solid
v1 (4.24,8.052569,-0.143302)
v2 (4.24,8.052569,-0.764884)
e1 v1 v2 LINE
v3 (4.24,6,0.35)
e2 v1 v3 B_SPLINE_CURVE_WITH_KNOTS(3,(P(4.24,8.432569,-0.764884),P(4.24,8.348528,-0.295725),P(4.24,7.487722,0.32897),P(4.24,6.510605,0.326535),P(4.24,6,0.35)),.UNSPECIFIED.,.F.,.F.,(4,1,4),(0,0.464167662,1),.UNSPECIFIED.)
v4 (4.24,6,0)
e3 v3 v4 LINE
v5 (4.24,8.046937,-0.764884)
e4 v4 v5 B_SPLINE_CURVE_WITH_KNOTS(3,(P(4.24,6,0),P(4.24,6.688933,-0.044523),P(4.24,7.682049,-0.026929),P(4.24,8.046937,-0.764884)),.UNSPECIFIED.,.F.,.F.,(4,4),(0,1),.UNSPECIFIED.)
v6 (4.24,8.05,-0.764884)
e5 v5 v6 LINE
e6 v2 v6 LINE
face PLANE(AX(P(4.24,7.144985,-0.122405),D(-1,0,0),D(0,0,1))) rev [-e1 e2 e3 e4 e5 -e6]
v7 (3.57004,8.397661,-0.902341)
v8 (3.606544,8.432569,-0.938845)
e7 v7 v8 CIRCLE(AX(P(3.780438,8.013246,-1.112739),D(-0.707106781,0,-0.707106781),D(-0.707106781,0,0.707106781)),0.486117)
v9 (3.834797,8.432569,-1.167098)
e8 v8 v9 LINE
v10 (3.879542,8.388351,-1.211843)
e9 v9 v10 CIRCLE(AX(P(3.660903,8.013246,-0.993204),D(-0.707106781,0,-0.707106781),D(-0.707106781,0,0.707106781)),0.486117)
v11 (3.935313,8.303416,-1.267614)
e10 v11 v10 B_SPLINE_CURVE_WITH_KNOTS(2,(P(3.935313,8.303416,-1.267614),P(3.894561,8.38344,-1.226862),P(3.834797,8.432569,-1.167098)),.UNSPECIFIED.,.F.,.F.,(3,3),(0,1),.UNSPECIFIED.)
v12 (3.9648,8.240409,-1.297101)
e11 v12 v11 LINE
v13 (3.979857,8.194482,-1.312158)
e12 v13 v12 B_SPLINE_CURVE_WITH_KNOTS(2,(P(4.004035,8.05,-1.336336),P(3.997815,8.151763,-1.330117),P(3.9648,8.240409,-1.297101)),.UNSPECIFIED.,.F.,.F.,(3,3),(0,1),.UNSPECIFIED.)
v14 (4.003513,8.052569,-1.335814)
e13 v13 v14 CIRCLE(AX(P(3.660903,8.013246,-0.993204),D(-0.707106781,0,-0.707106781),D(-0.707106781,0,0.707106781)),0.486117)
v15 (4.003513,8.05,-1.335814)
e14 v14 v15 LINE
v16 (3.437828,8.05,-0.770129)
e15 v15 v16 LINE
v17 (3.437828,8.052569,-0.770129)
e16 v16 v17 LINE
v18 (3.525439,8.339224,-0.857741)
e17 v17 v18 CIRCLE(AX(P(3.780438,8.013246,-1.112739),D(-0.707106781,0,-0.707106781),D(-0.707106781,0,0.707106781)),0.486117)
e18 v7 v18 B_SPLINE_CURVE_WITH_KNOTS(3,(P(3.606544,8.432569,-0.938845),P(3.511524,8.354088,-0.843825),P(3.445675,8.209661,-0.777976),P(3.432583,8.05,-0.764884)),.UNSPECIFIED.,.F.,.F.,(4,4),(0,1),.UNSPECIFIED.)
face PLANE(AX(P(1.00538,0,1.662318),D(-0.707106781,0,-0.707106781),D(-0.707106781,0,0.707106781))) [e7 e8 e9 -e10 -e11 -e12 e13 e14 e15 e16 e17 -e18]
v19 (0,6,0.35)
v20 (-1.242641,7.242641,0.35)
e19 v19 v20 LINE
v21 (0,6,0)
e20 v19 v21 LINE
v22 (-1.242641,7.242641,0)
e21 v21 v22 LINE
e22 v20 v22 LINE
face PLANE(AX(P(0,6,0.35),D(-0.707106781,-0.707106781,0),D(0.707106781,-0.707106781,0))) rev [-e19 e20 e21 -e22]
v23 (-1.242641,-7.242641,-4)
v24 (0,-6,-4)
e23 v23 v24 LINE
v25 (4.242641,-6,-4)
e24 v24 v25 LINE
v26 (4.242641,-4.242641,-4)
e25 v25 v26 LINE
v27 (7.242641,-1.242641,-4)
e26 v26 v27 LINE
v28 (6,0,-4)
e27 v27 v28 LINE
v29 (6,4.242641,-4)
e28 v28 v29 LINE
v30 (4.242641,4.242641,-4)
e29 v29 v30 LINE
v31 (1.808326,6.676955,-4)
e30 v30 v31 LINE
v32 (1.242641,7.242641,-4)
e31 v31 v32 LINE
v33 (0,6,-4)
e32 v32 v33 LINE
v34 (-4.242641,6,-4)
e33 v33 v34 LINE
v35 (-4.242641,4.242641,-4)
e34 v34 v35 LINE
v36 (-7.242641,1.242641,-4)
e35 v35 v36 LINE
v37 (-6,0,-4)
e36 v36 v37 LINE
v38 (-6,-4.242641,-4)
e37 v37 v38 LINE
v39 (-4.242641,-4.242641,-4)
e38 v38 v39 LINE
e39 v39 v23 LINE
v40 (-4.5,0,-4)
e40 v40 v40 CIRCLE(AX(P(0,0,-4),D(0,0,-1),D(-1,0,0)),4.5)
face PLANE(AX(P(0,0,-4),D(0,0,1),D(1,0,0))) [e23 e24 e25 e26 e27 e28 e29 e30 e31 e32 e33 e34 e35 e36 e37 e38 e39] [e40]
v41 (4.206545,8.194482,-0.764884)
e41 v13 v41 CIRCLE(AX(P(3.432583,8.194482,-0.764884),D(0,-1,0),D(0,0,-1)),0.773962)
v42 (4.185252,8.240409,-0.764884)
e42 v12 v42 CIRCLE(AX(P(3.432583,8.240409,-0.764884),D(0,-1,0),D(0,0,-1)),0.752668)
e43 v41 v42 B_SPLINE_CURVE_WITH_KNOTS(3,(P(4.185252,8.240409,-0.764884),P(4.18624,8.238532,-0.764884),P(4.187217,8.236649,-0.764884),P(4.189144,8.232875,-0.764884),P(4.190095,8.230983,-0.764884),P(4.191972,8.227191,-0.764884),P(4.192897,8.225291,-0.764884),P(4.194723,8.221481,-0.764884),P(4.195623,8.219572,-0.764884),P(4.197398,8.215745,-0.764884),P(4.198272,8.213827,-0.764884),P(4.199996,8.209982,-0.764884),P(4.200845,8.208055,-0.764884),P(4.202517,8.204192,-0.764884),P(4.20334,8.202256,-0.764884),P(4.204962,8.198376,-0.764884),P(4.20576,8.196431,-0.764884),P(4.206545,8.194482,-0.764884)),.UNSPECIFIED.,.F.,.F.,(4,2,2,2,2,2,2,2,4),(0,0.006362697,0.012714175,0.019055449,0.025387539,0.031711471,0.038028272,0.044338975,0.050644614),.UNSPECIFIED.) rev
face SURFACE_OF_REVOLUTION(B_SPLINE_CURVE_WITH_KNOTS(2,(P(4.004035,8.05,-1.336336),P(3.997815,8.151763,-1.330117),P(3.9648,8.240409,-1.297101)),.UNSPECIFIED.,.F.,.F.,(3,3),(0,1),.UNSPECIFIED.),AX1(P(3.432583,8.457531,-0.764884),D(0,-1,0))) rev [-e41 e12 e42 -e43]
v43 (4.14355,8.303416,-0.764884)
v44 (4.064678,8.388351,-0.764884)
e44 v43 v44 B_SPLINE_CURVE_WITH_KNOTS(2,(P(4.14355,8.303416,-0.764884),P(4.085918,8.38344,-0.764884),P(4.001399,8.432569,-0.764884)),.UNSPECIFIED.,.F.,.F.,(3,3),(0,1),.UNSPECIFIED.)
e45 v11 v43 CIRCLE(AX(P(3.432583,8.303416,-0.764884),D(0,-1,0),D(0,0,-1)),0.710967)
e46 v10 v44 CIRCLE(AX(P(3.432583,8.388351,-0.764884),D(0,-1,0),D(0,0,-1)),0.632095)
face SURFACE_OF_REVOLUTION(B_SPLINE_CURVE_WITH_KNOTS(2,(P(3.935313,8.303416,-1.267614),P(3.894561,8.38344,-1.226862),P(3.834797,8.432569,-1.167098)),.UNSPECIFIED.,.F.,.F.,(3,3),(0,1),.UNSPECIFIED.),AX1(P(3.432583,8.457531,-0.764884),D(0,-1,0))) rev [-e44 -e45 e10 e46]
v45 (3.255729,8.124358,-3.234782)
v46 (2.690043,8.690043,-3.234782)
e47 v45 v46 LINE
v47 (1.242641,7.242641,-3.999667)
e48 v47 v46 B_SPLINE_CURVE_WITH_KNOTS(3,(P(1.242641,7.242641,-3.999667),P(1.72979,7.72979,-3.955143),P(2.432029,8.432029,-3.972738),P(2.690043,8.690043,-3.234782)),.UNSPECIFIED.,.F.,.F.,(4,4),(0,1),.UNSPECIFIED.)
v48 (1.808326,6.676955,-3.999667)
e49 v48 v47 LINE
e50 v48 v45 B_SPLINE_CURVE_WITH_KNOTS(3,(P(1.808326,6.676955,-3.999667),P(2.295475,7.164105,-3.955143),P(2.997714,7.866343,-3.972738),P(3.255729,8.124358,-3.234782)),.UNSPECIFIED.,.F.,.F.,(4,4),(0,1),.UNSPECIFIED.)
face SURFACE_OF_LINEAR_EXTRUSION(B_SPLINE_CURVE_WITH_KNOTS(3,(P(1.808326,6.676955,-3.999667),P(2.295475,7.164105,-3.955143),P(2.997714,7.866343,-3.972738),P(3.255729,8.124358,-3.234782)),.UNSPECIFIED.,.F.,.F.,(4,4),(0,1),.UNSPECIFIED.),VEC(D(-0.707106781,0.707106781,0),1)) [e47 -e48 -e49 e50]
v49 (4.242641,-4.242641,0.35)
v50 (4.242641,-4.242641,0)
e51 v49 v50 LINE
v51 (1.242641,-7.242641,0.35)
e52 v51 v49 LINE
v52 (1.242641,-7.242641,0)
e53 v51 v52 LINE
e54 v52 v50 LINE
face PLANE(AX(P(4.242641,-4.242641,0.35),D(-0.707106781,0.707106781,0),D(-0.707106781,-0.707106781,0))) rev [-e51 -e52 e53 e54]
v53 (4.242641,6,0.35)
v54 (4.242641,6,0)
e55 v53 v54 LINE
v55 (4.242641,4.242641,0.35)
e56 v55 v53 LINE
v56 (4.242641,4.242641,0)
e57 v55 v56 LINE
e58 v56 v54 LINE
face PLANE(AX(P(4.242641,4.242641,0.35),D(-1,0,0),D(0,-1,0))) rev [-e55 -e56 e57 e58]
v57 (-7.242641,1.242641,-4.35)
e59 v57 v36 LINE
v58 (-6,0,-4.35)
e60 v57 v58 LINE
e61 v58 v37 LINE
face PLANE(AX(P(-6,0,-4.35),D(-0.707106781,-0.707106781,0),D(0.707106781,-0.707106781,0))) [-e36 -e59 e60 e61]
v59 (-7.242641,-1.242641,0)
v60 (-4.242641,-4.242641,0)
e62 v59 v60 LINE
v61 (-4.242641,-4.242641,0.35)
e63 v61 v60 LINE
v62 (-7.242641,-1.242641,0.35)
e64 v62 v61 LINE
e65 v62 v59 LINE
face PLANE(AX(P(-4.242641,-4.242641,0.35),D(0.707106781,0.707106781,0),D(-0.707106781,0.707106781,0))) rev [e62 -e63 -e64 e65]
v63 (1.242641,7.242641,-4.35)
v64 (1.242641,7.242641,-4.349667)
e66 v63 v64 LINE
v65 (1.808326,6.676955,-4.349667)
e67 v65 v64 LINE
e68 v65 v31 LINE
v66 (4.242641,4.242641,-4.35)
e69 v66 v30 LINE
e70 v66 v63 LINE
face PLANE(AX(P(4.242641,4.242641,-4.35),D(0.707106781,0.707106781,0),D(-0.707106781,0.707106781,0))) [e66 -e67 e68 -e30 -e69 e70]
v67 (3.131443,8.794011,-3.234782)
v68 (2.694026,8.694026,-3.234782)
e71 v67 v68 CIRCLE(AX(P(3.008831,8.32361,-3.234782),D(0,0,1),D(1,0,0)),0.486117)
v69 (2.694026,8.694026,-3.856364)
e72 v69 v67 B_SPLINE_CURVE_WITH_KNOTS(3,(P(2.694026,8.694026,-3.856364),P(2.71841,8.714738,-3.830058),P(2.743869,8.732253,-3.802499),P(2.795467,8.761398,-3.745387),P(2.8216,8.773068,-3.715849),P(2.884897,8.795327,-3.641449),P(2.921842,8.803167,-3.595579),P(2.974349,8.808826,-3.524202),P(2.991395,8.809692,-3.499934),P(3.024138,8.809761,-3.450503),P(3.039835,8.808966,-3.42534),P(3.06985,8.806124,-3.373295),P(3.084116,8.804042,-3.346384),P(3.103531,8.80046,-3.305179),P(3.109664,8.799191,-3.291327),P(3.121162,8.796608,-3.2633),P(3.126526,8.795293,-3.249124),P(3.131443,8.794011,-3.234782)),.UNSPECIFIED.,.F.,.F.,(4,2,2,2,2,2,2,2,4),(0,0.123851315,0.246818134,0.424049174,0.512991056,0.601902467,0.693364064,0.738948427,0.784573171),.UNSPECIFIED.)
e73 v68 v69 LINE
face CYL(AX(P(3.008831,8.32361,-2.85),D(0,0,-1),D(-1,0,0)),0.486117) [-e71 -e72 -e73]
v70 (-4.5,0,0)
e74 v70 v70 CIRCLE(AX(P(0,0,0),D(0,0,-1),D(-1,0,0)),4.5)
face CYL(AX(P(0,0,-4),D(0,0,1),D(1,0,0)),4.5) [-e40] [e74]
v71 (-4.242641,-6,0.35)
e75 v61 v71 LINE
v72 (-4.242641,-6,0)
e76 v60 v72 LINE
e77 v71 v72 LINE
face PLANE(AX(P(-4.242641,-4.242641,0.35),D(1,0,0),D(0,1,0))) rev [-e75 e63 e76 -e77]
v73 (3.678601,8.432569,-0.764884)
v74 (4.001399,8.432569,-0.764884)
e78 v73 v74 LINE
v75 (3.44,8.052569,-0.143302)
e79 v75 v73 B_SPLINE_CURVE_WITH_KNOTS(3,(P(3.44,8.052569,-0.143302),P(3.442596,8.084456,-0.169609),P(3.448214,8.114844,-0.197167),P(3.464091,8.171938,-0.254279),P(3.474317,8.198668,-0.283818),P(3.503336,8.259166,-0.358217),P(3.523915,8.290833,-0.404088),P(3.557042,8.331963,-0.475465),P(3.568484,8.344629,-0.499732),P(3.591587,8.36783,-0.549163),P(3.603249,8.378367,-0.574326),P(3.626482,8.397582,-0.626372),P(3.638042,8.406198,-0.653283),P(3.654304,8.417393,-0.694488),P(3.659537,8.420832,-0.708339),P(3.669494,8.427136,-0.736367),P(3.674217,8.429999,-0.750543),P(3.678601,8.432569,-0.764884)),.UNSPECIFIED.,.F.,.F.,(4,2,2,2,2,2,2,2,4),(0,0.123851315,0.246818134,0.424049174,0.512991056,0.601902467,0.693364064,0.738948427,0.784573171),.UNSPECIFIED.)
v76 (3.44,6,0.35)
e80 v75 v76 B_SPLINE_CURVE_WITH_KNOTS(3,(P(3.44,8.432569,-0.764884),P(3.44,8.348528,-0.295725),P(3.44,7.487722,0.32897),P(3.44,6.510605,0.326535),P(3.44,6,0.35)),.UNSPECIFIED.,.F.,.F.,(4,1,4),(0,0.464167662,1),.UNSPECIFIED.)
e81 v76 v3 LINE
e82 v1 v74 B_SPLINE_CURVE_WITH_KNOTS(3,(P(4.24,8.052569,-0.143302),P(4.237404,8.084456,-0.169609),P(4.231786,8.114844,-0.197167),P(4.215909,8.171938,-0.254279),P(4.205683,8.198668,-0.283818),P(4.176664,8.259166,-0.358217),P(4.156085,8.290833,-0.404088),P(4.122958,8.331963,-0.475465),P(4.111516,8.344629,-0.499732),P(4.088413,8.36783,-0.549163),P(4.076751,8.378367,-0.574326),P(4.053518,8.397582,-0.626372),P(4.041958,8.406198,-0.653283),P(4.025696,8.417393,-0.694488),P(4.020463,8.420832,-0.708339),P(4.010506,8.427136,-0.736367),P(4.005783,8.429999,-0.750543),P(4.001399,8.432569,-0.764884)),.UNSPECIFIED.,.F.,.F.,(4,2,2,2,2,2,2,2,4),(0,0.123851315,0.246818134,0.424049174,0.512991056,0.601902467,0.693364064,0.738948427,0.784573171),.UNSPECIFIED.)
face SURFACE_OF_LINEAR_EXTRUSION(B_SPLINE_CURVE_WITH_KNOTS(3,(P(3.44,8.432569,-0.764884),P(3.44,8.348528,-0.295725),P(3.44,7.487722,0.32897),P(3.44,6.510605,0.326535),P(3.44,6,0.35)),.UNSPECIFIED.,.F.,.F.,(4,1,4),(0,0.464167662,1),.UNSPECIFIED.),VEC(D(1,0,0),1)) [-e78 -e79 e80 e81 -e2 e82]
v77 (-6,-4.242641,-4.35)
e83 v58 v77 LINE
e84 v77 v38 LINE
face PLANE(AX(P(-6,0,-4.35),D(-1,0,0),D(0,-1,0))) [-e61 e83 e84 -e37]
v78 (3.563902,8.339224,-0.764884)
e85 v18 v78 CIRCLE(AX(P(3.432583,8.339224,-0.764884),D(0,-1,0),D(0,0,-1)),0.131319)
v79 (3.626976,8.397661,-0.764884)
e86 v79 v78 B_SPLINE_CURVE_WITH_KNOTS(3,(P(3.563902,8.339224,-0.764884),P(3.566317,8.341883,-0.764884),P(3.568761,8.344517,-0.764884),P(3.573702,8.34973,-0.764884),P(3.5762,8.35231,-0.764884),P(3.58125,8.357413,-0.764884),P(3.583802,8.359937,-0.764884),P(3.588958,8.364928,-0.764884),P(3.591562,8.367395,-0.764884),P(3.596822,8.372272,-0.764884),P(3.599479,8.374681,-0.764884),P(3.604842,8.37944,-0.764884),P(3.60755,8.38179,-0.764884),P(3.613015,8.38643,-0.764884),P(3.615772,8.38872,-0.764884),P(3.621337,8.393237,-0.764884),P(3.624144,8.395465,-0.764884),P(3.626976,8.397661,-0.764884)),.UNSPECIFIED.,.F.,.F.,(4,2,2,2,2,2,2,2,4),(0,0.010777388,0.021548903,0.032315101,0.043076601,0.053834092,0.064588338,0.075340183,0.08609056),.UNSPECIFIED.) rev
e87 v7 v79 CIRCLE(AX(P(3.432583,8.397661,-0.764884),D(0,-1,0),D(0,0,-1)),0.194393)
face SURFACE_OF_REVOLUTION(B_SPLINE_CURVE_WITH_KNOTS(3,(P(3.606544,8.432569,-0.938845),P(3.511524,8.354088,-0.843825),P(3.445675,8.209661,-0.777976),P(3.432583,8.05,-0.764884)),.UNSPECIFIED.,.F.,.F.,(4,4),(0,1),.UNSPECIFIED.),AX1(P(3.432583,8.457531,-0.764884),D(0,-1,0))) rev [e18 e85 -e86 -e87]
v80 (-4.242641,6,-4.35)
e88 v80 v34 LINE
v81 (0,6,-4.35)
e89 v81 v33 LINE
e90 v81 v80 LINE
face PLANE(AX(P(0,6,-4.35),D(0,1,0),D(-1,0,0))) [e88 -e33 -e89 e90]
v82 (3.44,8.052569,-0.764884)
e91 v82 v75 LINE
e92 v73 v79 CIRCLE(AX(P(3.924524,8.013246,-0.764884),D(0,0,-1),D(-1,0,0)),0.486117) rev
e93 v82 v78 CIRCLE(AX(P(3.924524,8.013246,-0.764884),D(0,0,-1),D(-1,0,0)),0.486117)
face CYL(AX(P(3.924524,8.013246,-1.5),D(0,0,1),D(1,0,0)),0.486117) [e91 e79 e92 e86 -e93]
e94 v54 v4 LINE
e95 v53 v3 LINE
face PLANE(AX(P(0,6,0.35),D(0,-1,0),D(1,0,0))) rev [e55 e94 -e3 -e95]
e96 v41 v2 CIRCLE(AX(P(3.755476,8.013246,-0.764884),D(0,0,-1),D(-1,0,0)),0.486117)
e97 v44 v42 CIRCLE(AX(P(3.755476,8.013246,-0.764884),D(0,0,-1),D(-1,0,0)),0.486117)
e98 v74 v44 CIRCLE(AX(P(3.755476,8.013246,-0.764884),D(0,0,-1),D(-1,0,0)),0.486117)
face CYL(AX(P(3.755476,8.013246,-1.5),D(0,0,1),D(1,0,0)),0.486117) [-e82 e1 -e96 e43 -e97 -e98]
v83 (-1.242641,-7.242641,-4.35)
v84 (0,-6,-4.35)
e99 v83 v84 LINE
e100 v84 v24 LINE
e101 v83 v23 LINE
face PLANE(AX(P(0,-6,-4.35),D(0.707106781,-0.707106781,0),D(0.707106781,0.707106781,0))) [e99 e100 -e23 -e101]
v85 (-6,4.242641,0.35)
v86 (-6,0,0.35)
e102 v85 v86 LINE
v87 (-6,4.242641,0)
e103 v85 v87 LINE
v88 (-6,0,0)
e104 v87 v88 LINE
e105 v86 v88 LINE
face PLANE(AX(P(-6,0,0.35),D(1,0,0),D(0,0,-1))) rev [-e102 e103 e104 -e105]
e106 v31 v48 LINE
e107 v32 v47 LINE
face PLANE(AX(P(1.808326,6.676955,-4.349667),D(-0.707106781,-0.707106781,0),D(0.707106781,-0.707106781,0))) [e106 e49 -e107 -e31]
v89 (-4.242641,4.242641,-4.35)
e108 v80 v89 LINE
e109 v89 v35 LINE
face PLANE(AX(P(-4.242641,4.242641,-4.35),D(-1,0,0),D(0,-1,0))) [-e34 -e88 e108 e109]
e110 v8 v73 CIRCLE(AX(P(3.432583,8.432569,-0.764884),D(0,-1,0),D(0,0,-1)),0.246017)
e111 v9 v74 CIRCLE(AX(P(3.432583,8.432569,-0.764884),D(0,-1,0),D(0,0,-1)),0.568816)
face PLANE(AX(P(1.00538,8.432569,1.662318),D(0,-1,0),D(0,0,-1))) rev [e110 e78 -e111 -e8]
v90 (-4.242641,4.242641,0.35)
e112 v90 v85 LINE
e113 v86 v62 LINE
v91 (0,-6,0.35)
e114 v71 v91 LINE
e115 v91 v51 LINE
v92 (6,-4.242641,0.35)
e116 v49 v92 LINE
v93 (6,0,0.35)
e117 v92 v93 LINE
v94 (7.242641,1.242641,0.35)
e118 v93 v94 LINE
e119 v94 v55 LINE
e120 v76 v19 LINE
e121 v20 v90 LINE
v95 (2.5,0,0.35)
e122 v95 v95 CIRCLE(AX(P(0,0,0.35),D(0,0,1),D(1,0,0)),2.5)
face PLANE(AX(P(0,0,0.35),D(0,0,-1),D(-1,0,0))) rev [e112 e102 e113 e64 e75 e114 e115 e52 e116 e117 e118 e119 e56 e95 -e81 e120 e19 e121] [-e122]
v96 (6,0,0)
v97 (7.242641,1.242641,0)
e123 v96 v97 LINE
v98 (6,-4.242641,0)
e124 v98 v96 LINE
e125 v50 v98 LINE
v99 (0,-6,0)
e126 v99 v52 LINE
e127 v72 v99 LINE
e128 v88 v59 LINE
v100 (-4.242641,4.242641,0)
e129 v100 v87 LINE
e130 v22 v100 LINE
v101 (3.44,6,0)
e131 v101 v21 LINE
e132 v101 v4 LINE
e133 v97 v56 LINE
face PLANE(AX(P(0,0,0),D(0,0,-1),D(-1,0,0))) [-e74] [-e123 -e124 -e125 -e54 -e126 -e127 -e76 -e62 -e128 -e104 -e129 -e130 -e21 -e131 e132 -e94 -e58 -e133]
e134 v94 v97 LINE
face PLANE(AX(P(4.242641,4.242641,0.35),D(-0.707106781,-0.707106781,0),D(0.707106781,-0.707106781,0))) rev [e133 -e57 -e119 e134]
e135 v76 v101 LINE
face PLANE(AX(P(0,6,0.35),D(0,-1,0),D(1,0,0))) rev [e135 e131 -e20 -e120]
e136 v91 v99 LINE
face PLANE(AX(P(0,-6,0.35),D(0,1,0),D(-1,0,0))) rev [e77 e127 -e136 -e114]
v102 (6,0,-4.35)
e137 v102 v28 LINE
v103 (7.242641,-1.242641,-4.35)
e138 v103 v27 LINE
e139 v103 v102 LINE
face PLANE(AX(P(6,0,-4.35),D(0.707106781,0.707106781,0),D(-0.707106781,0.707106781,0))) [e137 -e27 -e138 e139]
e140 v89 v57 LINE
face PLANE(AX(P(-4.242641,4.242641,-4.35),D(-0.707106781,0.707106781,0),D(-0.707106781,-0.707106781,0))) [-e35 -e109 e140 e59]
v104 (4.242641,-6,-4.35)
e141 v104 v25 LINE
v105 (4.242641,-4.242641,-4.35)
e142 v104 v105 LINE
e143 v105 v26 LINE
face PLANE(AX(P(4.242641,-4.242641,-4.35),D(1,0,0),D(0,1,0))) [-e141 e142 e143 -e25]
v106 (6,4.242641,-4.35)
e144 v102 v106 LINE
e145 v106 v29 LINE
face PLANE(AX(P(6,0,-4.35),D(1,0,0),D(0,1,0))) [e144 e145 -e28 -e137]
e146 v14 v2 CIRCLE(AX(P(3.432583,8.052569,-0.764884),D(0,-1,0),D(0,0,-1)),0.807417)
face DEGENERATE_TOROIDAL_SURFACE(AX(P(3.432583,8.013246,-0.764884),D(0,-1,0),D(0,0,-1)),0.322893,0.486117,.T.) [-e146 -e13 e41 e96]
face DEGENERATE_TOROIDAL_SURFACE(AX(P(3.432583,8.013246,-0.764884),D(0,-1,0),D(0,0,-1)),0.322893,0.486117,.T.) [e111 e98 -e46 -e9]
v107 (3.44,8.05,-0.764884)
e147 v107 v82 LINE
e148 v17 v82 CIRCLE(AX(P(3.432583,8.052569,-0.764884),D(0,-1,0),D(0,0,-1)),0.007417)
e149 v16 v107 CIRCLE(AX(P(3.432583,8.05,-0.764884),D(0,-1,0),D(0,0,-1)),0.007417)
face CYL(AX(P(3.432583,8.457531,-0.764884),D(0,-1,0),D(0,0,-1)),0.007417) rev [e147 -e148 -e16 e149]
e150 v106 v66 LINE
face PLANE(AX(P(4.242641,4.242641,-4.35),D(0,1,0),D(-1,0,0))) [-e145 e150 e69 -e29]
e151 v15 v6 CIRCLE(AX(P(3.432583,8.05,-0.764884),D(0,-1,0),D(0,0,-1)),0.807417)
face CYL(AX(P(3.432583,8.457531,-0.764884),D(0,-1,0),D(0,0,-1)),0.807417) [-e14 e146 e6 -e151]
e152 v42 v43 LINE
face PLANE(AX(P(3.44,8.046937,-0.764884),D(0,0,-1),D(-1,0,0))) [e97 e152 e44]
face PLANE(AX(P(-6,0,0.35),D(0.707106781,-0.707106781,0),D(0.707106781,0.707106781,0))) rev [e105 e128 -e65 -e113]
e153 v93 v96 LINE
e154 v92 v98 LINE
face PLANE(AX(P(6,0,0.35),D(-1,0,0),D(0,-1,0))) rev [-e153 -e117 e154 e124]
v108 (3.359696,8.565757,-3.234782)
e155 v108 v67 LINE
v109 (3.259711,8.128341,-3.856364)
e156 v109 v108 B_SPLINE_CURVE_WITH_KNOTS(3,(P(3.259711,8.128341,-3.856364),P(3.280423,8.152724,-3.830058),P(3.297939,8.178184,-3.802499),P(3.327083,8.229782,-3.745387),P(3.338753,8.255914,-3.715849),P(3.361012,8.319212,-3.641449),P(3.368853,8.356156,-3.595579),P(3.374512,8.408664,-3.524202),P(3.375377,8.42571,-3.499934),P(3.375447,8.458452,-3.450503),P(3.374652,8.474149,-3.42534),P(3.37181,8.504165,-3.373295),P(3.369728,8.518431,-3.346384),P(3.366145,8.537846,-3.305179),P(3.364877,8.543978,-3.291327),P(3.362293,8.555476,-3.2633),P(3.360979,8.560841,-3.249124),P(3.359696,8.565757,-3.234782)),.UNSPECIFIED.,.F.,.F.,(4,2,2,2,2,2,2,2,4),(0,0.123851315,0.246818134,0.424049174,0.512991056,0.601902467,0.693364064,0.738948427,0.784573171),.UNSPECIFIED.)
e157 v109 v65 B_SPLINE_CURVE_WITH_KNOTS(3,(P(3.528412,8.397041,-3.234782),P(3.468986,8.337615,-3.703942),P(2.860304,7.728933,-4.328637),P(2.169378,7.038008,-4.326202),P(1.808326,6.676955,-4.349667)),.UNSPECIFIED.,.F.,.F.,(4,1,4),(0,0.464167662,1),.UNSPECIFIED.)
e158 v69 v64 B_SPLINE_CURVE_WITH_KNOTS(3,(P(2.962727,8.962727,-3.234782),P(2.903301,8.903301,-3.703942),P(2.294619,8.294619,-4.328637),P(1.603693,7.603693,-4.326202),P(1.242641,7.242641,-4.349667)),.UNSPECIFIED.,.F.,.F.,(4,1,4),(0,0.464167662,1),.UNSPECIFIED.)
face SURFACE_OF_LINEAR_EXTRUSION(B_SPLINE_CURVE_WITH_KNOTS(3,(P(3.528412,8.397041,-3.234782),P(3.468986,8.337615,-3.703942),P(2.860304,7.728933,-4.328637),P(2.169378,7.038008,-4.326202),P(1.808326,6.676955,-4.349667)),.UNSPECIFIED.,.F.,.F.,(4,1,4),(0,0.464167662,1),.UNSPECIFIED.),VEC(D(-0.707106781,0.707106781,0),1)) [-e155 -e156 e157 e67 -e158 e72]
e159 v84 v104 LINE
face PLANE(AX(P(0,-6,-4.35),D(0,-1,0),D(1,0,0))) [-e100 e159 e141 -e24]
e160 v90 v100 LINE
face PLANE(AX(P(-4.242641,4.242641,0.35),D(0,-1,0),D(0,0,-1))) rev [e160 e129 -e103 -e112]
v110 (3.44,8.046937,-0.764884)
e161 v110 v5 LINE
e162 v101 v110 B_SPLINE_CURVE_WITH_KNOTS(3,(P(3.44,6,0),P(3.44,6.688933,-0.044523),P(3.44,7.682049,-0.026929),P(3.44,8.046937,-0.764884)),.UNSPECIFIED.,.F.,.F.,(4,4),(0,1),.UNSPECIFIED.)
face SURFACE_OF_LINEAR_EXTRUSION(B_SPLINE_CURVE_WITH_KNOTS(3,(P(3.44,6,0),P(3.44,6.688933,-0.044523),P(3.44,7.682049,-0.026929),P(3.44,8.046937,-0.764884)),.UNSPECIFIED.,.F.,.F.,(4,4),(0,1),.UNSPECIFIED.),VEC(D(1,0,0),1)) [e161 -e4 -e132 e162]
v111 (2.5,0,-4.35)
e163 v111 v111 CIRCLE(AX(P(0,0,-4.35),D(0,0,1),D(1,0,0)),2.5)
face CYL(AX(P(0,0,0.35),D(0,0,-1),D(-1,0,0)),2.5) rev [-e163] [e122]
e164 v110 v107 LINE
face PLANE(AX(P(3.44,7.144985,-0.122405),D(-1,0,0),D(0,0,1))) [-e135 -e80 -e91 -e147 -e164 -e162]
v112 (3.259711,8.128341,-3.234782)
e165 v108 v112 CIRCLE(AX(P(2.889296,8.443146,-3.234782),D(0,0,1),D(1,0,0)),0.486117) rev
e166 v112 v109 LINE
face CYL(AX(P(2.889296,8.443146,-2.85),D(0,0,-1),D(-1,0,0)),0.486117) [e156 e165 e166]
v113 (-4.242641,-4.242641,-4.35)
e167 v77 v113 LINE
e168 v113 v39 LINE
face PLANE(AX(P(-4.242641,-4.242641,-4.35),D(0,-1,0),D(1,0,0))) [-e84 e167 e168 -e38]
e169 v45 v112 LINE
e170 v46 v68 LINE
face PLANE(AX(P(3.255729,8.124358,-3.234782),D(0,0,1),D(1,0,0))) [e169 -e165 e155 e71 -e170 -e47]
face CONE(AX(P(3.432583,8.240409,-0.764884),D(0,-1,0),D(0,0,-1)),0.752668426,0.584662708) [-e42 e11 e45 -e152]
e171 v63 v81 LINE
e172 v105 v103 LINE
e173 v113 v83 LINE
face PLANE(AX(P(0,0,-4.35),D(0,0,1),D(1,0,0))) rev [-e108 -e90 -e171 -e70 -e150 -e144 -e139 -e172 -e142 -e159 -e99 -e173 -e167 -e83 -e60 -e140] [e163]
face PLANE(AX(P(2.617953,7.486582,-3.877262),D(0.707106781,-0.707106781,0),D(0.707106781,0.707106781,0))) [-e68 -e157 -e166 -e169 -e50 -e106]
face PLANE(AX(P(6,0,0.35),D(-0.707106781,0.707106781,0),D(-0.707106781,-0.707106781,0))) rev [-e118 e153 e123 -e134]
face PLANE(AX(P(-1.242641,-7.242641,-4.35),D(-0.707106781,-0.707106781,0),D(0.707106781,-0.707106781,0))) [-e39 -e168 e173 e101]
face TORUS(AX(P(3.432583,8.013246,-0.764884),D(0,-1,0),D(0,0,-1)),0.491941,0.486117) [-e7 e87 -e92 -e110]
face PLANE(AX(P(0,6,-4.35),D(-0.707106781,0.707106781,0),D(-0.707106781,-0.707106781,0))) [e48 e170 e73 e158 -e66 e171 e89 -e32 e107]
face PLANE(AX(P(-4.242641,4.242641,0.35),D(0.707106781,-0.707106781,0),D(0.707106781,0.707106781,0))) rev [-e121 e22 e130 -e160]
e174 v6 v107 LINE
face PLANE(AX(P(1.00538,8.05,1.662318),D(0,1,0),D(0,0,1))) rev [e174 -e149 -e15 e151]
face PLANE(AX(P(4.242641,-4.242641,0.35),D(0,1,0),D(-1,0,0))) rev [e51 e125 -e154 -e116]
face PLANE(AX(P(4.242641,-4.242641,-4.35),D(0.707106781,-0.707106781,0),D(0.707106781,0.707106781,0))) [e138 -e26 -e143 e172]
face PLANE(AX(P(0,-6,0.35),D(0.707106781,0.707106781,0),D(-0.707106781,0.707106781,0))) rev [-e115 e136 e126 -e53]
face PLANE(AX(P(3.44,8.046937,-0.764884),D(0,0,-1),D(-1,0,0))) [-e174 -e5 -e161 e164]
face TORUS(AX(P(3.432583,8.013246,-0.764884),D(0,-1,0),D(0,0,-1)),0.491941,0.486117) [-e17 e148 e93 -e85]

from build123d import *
from build123d.topology import SkipClean

# Parameters (mm, degrees)
SKETCH1_R           = 2.5
BOSS_EXTRUDE1_DEPTH = 0.35
BOSS_EXTRUDE2_START = 4
SKETCH2_R           = 4.5
SKETCH2_R_2         = 2.5
BOSS_EXTRUDE2_DEPTH = 4
BOSS_EXTRUDE3_START = -0.35
SKETCH3_R           = 2.5
BOSS_EXTRUDE3_DEPTH = 0.35
BOSS_EXTRUDE4_DEPTH = 0.8
BOSS_EXTRUDE5_DEPTH = 0.8
CUT_EXTRUDE1_DEPTH  = 1.5
CUT_EXTRUDE3_DEPTH  = 1.5
REVOLVE1_ANGLE      = 45


# Read off the part's stored shape, not the designer's step: Revolve1
with BuildPart() as part:
    # Sketch1 → Boss-Extrude1 (new body)
    with BuildSketch(Plane.XY):
        Polygon((-6, 0), (-6, 4.242640687), (-4.242640687, 4.242640687), (-1.242640687, 7.242640687), (0, 6), (4.242640687, 6), (4.242640687, 4.242640687), (7.242640687, 1.242640687), (6, 0), (6, -4.242640687), (4.242640687, -4.242640687), (1.242640687, -7.242640687), (0, -6), (-4.242640687, -6), (-4.242640687, -4.242640687), (-7.242640687, -1.242640687), align=None)
        Circle(SKETCH1_R, mode=Mode.SUBTRACT)
    extrude(amount=BOSS_EXTRUDE1_DEPTH)

    # Sketch2 → Boss-Extrude2 (add)
    with SkipClean():  # the faces are left unmerged after this step: merging them gives an invalid solid
        with BuildSketch(Plane(origin=(0, 0, 0), x_dir=(-1, 0, 0), z_dir=(0, 0, -1)).offset(BOSS_EXTRUDE2_START)):
            Circle(SKETCH2_R)
            Circle(SKETCH2_R_2, mode=Mode.SUBTRACT)
        extrude(amount=-BOSS_EXTRUDE2_DEPTH)

    # Sketch3 → Boss-Extrude3 (add)
    with SkipClean():  # the faces are left unmerged after this step: merging them gives an invalid solid
        with BuildSketch(Plane.XY.offset(-4).offset(BOSS_EXTRUDE3_START)):
            Polygon((6, 0), (6, 4.242640687), (4.242640687, 4.242640687), (1.242640687, 7.242640687), (0, 6), (-4.242640687, 6), (-4.242640687, 4.242640687), (-7.242640687, 1.242640687), (-6, 0), (-6, -4.242640687), (-4.242640687, -4.242640687), (-1.242640687, -7.242640687), (0, -6), (4.242640687, -6), (4.242640687, -4.242640687), (7.242640687, -1.242640687), align=None)
            Circle(SKETCH3_R, mode=Mode.SUBTRACT)
        extrude(amount=BOSS_EXTRUDE3_DEPTH)

    # Sketch7 → Boss-Extrude4 (add)
    with SkipClean():  # the faces are left unmerged after this step: merging them gives an invalid solid
        with BuildSketch(Plane(origin=(4.24, 0, 0), x_dir=(0, 0, -1), z_dir=(1, 0, 0))):
            with BuildLine():
                Line((-0.35, 6), (0, 6))
                add(Edge.make_bspline(
                    [(0, 6), (0.044523166, 6.688933237), (0.026928632, 7.682048661), (0.764884365, 8.046936554)],
                    knots=[0, 0, 0, 0, 1, 1, 1, 1], degree=3))
                Line((0.764884365, 8.046936554), (0.764884365, 8.432568867))
                add(Edge.make_bspline(
                    [(-0.35, 6), (-0.3265351, 6.510605177), (-0.328970026, 7.48772187), (0.295724978, 8.348528015), (0.764884365, 8.432568867)],
                    knots=[0, 0, 0, 0, 0.535832338, 1, 1, 1, 1], degree=3))
            make_face()
        extrude(amount=-BOSS_EXTRUDE4_DEPTH)

    # Sketch9 → Boss-Extrude5 (add)
    with SkipClean():  # the faces are left unmerged after this step: merging them gives an invalid solid
        with BuildSketch(Plane(origin=(-3, 3, 0), x_dir=(0.7071067811865553, 0.7071067811865398, 0), z_dir=(-0.7071067811865398, 0.7071067811865553, 0))):
            with BuildLine():
                Line((6, 4.349666521), (6, 3.999666521))
                add(Edge.make_bspline(
                    [(6, 3.999666521), (6.688933237, 3.955143355), (7.682048661, 3.972737889), (8.046936554, 3.234782156)],
                    knots=[0, 0, 0, 0, 1, 1, 1, 1], degree=3))
                Line((8.046936554, 3.234782156), (8.432568867, 3.234782156))
                add(Edge.make_bspline(
                    [(6, 4.349666521), (6.510605177, 4.326201622), (7.48772187, 4.328636548), (8.348528015, 3.703941543), (8.432568867, 3.234782156)],
                    knots=[0, 0, 0, 0, 0.535832338, 1, 1, 1, 1], degree=3))
            make_face()
        extrude(amount=-BOSS_EXTRUDE5_DEPTH)

    # Sketch10 → Cut-Extrude1 (cut)
    with SkipClean():  # the faces are left unmerged after this step: merging them gives an invalid solid
        with BuildSketch(Plane.XY):
            with BuildLine():
                Line((3.678600588, 8.432568867), (3.44, 8.432568867))
                Line((3.44, 8.432568867), (3.44, 8.052568867))
                ThreePointArc((3.44, 8.052568867), (3.512834389, 8.271744637), (3.678600588, 8.432568867))
            make_face()
            with BuildLine():
                Line((4.24, 8.432568867), (4.001399412, 8.432568867))
                ThreePointArc((4.001399412, 8.432568867), (4.167165611, 8.271744637), (4.24, 8.052568867))
                Line((4.24, 8.052568867), (4.24, 8.432568867))
            make_face()
        extrude(amount=-CUT_EXTRUDE1_DEPTH, mode=Mode.SUBTRACT)

    # Sketch12 → Cut-Extrude3 (cut)
    with SkipClean():  # the faces are left unmerged after this step: merging them gives an invalid solid
        with BuildSketch(Plane(origin=(0, 0, -4.35), x_dir=(-1, 0, 0), z_dir=(0, 0, -1))):
            with BuildLine():
                Line((-2.962726629, 8.962726629), (-3.131442723, 8.794010535))
                ThreePointArc((-3.131442723, 8.794010535), (-2.900508415, 8.797505035), (-2.694026052, 8.694026052))
                Line((-2.694026052, 8.694026052), (-2.962726629, 8.962726629))
            make_face()
            with BuildLine():
                Line((-3.359695959, 8.565757298), (-3.528412054, 8.397041204))
                Line((-3.528412054, 8.397041204), (-3.259711477, 8.128340627))
                ThreePointArc((-3.259711477, 8.128340627), (-3.36319046, 8.33482299), (-3.359695959, 8.565757298))
            make_face()
        extrude(amount=-CUT_EXTRUDE3_DEPTH, mode=Mode.SUBTRACT)

    # Revolve1 outline → Revolve1 (revolve)
    with SkipClean():  # the faces are left unmerged after this step: merging them gives an invalid solid
        with BuildSketch(Plane(origin=(3.432583134, 0, -0.764884365), x_dir=(1, 0, 0), z_dir=(0, 0, 1))):
            with BuildLine():
                add(Edge.make_bspline(
                    [(0.194392704, 8.397661208), (0.171741377, 8.380090633), (0.150646817, 8.360505272), (0.131318656, 8.339223824)],
                    knots=[0.133748192, 0.133748192, 0.133748192, 0.133748192, 0.318286033, 0.318286033, 0.318286033, 0.318286033], degree=3))
                ThreePointArc((0.131318656, 8.339223824), (0.04572255, 8.206116591), (0.007416866, 8.052568867))
                Line((0.007416866, 8.052568867), (0.007416866, 8.05))
                Line((0.007416866, 8.05), (0.807416866, 8.05))
                Line((0.807416866, 8.05), (0.807416866, 8.052568867))
                ThreePointArc((0.807416866, 8.052568867), (0.796040292, 8.124786712), (0.773962097, 8.19448174))
                add(Edge.make_bspline(
                    [(0.773962097, 8.19448174), (0.764540222, 8.217869205), (0.752668426, 8.240408571)],
                    knots=[0.745735048, 0.745735048, 0.745735048, 1, 1, 1], degree=2))
                Line((0.752668426, 8.240408571), (0.710966725, 8.303416061))
                add(Edge.make_bspline(
                    [(0.710966725, 8.303416061), (0.676374455, 8.351449049), (0.632095195, 8.38835115)],
                    knots=[0, 0, 0, 0.600232212, 0.600232212, 0.600232212], degree=2))
                ThreePointArc((0.632095195, 8.38835115), (0.601334867, 8.411718112), (0.568816277, 8.432568867))
                Line((0.568816277, 8.432568867), (0.246017454, 8.432568867))
                ThreePointArc((0.246017454, 8.432568867), (0.219645119, 8.415943159), (0.194392704, 8.397661208))
            make_face()
        revolve(axis=Axis((3.432583134, 0, -0.764884365), (0, 1, 0)), revolution_arc=REVOLVE1_ANGLE)


solid = part.part
